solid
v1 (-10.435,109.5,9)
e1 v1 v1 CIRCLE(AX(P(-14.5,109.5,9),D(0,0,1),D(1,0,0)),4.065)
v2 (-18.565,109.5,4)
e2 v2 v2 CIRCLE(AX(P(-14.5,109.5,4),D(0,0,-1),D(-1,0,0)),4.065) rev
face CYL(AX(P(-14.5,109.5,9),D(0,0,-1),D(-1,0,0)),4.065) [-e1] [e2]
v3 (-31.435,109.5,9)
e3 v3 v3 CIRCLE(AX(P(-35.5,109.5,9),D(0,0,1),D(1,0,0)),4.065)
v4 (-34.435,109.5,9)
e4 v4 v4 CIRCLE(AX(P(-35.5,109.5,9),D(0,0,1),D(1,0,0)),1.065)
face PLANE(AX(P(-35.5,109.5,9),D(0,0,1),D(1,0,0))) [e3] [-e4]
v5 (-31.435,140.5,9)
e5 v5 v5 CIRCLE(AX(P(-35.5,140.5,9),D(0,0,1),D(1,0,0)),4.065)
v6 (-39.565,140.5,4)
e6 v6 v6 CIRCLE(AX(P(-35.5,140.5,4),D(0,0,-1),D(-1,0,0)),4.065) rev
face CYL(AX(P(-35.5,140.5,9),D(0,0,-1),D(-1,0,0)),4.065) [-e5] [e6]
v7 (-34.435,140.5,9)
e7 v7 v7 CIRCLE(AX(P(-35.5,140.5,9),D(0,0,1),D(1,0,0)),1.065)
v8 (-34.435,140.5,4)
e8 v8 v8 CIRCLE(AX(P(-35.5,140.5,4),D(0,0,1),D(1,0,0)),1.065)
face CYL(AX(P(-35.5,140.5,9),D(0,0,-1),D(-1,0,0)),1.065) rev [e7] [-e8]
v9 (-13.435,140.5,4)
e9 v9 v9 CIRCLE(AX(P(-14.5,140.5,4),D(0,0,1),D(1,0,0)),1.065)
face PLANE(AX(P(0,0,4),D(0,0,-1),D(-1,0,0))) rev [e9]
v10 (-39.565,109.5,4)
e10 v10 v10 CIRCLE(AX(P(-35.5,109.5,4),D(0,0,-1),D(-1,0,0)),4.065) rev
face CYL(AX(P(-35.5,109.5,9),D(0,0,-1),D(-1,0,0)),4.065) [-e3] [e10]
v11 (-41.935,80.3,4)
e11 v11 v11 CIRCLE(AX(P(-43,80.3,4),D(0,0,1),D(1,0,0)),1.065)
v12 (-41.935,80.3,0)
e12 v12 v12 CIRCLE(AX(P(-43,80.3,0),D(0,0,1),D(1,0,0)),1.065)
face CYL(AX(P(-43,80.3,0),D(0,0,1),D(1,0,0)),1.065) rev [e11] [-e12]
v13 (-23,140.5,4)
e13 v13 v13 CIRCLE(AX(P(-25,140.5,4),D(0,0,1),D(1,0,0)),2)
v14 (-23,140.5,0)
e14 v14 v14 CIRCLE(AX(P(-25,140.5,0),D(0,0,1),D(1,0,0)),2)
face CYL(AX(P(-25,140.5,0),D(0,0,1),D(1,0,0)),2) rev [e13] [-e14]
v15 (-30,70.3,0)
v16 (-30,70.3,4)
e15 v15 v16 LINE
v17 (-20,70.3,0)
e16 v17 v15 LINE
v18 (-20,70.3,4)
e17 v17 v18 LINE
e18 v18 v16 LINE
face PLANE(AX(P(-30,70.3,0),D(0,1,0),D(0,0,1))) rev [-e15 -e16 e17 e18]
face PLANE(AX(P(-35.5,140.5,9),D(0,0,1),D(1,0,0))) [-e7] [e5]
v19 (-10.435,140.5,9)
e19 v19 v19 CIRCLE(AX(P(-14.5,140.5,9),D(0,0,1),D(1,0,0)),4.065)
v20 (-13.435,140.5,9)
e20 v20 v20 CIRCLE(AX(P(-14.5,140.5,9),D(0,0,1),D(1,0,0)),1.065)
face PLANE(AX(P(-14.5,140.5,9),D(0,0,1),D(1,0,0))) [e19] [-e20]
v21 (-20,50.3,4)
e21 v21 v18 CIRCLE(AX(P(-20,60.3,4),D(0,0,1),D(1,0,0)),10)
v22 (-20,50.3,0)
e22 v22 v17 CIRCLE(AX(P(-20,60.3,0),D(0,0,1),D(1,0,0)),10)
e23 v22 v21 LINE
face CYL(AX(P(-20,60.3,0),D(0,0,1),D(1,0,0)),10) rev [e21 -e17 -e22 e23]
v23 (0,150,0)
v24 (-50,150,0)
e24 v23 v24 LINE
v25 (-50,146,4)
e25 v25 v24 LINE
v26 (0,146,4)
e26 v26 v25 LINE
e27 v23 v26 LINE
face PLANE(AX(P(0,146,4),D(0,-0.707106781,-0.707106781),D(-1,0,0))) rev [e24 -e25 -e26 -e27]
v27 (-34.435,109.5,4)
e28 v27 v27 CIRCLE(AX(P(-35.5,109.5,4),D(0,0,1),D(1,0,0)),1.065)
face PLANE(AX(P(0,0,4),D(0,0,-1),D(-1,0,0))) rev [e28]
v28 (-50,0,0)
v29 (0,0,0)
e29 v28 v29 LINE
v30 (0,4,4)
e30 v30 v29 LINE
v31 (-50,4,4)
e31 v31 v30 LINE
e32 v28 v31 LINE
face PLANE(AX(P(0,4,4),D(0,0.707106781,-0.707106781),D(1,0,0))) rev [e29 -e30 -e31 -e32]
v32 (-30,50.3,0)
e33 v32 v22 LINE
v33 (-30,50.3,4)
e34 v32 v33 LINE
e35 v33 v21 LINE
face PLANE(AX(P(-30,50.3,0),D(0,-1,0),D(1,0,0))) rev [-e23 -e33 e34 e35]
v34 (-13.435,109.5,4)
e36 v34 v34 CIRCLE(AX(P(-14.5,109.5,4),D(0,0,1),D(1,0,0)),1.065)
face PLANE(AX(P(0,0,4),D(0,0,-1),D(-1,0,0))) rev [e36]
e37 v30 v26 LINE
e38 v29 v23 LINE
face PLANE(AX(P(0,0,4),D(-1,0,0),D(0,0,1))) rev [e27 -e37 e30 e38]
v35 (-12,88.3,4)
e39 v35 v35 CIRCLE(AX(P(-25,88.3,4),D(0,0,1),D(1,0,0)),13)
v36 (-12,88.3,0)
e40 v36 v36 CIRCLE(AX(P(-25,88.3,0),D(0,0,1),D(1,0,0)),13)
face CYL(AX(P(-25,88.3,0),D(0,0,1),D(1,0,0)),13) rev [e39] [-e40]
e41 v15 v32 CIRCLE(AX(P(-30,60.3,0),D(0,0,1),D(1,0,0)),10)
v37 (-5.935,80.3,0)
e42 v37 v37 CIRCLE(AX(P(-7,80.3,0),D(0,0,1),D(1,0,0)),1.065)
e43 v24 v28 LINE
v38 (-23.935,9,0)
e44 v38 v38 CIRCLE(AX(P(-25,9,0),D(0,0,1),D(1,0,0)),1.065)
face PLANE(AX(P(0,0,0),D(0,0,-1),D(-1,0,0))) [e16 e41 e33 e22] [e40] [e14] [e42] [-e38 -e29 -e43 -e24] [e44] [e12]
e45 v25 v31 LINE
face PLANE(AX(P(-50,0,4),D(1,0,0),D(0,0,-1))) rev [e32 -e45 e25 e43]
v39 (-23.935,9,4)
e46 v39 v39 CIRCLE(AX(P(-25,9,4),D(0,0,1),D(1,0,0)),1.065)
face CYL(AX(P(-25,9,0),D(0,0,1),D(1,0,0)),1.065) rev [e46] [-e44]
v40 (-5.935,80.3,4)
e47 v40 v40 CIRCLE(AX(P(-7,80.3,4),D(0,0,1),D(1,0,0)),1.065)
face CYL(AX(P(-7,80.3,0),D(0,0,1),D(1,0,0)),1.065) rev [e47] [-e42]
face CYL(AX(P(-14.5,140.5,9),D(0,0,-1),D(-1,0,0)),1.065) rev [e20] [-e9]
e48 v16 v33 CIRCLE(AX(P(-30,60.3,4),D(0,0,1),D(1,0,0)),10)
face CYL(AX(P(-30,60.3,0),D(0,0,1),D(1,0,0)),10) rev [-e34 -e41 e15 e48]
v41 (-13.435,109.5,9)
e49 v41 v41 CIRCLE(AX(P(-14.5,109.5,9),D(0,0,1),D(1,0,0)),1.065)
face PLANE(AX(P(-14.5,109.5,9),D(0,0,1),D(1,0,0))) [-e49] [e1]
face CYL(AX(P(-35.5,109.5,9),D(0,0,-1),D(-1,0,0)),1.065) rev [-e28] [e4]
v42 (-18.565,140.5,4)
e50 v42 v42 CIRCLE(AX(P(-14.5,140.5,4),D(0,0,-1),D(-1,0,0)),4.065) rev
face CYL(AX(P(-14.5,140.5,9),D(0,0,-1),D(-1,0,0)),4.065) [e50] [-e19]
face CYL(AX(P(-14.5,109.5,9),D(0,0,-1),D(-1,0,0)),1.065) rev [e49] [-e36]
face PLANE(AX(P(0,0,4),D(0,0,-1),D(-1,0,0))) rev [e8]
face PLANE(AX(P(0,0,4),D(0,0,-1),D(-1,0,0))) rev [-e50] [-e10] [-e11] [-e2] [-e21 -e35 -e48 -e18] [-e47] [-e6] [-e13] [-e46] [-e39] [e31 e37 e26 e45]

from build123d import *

# Parameters (mm, degrees)
SKETCH1_W           = 150
SKETCH1_H           = 50
BOSS_EXTRUDE1_DEPTH = 4
CHAMFER1_SIZE       = 4
SKETCH2_R           = 13
SKETCH2_R_2         = 1.065
SKETCH2_R_3         = 2
CUT_EXTRUDE2_DEPTH  = 4
SKETCH6_R           = 4.065
SKETCH6_R_2         = 1.065
BOSS_EXTRUDE2_DEPTH = 5


with BuildPart() as part:
    # Sketch1 → Boss-Extrude1 (new body)
    with BuildSketch(Plane(origin=(0, 0, 0), x_dir=(0, 1, 0), z_dir=(0, 0, 1))):
        with Locations((75, 25)):
            Rectangle(SKETCH1_W, SKETCH1_H)
    extrude(amount=BOSS_EXTRUDE1_DEPTH)

    # Chamfer1
    chamfer1_edges = [part.edges().sort_by_distance(p)[0] for p in [
        (-25, 150, 4),
        (-25, 0, 4),
    ]]
    chamfer(chamfer1_edges, length=CHAMFER1_SIZE - 0.0001)  # a hair under: the kernel refuses the full size

    # Sketch2 → Cut-Extrude2 (cut)
    with BuildSketch(Plane.XY.offset(4)):
        with Locations((-25, 88.3)):
            Circle(SKETCH2_R)
        with Locations((-25, 9)):
            Circle(SKETCH2_R_2)
        with Locations((-7, 80.3)):
            Circle(SKETCH2_R_2)
        with Locations((-43, 80.3)):
            Circle(SKETCH2_R_2)
        with Locations((-25, 140.5)):
            Circle(SKETCH2_R_3)
        with BuildLine():
            Line((-30, 70.3), (-20, 70.3))
            ThreePointArc((-20, 70.3), (-10, 60.3), (-20, 50.3))
            Line((-20, 50.3), (-30, 50.3))
            ThreePointArc((-30, 50.3), (-40, 60.3), (-30, 70.3))
        make_face()
    extrude(amount=-CUT_EXTRUDE2_DEPTH, mode=Mode.SUBTRACT)

    # Sketch6 → Boss-Extrude2 (add)
    # profile 1 of 4: a face of its own
    with BuildSketch(Plane.XY.offset(4)):
        with Locations(Location((-35.5, 140.5, 0), (0, 0, 180))):
            Circle(SKETCH6_R)
        with Locations((-35.5, 140.5)):
            Circle(SKETCH6_R_2, mode=Mode.SUBTRACT)
    # profile 2 of 4: a face of its own
    with BuildSketch(Plane.XY.offset(4)):
        with Locations(Location((-14.5, 140.5, 0), (0, 0, 180))):
            Circle(SKETCH6_R)
        with Locations((-14.5, 140.5)):
            Circle(SKETCH6_R_2, mode=Mode.SUBTRACT)
    # profile 3 of 4: a face of its own
    with BuildSketch(Plane.XY.offset(4)):
        with Locations(Location((-14.5, 109.5, 0), (0, 0, 180))):
            Circle(SKETCH6_R)
        with Locations((-14.5, 109.5)):
            Circle(SKETCH6_R_2, mode=Mode.SUBTRACT)
    # profile 4 of 4: a face of its own
    with BuildSketch(Plane.XY.offset(4)):
        with Locations(Location((-35.5, 109.5, 0), (0, 0, 180))):
            Circle(SKETCH6_R)
        with Locations((-35.5, 109.5)):
            Circle(SKETCH6_R_2, mode=Mode.SUBTRACT)
    extrude(amount=BOSS_EXTRUDE2_DEPTH)


solid = part.part
